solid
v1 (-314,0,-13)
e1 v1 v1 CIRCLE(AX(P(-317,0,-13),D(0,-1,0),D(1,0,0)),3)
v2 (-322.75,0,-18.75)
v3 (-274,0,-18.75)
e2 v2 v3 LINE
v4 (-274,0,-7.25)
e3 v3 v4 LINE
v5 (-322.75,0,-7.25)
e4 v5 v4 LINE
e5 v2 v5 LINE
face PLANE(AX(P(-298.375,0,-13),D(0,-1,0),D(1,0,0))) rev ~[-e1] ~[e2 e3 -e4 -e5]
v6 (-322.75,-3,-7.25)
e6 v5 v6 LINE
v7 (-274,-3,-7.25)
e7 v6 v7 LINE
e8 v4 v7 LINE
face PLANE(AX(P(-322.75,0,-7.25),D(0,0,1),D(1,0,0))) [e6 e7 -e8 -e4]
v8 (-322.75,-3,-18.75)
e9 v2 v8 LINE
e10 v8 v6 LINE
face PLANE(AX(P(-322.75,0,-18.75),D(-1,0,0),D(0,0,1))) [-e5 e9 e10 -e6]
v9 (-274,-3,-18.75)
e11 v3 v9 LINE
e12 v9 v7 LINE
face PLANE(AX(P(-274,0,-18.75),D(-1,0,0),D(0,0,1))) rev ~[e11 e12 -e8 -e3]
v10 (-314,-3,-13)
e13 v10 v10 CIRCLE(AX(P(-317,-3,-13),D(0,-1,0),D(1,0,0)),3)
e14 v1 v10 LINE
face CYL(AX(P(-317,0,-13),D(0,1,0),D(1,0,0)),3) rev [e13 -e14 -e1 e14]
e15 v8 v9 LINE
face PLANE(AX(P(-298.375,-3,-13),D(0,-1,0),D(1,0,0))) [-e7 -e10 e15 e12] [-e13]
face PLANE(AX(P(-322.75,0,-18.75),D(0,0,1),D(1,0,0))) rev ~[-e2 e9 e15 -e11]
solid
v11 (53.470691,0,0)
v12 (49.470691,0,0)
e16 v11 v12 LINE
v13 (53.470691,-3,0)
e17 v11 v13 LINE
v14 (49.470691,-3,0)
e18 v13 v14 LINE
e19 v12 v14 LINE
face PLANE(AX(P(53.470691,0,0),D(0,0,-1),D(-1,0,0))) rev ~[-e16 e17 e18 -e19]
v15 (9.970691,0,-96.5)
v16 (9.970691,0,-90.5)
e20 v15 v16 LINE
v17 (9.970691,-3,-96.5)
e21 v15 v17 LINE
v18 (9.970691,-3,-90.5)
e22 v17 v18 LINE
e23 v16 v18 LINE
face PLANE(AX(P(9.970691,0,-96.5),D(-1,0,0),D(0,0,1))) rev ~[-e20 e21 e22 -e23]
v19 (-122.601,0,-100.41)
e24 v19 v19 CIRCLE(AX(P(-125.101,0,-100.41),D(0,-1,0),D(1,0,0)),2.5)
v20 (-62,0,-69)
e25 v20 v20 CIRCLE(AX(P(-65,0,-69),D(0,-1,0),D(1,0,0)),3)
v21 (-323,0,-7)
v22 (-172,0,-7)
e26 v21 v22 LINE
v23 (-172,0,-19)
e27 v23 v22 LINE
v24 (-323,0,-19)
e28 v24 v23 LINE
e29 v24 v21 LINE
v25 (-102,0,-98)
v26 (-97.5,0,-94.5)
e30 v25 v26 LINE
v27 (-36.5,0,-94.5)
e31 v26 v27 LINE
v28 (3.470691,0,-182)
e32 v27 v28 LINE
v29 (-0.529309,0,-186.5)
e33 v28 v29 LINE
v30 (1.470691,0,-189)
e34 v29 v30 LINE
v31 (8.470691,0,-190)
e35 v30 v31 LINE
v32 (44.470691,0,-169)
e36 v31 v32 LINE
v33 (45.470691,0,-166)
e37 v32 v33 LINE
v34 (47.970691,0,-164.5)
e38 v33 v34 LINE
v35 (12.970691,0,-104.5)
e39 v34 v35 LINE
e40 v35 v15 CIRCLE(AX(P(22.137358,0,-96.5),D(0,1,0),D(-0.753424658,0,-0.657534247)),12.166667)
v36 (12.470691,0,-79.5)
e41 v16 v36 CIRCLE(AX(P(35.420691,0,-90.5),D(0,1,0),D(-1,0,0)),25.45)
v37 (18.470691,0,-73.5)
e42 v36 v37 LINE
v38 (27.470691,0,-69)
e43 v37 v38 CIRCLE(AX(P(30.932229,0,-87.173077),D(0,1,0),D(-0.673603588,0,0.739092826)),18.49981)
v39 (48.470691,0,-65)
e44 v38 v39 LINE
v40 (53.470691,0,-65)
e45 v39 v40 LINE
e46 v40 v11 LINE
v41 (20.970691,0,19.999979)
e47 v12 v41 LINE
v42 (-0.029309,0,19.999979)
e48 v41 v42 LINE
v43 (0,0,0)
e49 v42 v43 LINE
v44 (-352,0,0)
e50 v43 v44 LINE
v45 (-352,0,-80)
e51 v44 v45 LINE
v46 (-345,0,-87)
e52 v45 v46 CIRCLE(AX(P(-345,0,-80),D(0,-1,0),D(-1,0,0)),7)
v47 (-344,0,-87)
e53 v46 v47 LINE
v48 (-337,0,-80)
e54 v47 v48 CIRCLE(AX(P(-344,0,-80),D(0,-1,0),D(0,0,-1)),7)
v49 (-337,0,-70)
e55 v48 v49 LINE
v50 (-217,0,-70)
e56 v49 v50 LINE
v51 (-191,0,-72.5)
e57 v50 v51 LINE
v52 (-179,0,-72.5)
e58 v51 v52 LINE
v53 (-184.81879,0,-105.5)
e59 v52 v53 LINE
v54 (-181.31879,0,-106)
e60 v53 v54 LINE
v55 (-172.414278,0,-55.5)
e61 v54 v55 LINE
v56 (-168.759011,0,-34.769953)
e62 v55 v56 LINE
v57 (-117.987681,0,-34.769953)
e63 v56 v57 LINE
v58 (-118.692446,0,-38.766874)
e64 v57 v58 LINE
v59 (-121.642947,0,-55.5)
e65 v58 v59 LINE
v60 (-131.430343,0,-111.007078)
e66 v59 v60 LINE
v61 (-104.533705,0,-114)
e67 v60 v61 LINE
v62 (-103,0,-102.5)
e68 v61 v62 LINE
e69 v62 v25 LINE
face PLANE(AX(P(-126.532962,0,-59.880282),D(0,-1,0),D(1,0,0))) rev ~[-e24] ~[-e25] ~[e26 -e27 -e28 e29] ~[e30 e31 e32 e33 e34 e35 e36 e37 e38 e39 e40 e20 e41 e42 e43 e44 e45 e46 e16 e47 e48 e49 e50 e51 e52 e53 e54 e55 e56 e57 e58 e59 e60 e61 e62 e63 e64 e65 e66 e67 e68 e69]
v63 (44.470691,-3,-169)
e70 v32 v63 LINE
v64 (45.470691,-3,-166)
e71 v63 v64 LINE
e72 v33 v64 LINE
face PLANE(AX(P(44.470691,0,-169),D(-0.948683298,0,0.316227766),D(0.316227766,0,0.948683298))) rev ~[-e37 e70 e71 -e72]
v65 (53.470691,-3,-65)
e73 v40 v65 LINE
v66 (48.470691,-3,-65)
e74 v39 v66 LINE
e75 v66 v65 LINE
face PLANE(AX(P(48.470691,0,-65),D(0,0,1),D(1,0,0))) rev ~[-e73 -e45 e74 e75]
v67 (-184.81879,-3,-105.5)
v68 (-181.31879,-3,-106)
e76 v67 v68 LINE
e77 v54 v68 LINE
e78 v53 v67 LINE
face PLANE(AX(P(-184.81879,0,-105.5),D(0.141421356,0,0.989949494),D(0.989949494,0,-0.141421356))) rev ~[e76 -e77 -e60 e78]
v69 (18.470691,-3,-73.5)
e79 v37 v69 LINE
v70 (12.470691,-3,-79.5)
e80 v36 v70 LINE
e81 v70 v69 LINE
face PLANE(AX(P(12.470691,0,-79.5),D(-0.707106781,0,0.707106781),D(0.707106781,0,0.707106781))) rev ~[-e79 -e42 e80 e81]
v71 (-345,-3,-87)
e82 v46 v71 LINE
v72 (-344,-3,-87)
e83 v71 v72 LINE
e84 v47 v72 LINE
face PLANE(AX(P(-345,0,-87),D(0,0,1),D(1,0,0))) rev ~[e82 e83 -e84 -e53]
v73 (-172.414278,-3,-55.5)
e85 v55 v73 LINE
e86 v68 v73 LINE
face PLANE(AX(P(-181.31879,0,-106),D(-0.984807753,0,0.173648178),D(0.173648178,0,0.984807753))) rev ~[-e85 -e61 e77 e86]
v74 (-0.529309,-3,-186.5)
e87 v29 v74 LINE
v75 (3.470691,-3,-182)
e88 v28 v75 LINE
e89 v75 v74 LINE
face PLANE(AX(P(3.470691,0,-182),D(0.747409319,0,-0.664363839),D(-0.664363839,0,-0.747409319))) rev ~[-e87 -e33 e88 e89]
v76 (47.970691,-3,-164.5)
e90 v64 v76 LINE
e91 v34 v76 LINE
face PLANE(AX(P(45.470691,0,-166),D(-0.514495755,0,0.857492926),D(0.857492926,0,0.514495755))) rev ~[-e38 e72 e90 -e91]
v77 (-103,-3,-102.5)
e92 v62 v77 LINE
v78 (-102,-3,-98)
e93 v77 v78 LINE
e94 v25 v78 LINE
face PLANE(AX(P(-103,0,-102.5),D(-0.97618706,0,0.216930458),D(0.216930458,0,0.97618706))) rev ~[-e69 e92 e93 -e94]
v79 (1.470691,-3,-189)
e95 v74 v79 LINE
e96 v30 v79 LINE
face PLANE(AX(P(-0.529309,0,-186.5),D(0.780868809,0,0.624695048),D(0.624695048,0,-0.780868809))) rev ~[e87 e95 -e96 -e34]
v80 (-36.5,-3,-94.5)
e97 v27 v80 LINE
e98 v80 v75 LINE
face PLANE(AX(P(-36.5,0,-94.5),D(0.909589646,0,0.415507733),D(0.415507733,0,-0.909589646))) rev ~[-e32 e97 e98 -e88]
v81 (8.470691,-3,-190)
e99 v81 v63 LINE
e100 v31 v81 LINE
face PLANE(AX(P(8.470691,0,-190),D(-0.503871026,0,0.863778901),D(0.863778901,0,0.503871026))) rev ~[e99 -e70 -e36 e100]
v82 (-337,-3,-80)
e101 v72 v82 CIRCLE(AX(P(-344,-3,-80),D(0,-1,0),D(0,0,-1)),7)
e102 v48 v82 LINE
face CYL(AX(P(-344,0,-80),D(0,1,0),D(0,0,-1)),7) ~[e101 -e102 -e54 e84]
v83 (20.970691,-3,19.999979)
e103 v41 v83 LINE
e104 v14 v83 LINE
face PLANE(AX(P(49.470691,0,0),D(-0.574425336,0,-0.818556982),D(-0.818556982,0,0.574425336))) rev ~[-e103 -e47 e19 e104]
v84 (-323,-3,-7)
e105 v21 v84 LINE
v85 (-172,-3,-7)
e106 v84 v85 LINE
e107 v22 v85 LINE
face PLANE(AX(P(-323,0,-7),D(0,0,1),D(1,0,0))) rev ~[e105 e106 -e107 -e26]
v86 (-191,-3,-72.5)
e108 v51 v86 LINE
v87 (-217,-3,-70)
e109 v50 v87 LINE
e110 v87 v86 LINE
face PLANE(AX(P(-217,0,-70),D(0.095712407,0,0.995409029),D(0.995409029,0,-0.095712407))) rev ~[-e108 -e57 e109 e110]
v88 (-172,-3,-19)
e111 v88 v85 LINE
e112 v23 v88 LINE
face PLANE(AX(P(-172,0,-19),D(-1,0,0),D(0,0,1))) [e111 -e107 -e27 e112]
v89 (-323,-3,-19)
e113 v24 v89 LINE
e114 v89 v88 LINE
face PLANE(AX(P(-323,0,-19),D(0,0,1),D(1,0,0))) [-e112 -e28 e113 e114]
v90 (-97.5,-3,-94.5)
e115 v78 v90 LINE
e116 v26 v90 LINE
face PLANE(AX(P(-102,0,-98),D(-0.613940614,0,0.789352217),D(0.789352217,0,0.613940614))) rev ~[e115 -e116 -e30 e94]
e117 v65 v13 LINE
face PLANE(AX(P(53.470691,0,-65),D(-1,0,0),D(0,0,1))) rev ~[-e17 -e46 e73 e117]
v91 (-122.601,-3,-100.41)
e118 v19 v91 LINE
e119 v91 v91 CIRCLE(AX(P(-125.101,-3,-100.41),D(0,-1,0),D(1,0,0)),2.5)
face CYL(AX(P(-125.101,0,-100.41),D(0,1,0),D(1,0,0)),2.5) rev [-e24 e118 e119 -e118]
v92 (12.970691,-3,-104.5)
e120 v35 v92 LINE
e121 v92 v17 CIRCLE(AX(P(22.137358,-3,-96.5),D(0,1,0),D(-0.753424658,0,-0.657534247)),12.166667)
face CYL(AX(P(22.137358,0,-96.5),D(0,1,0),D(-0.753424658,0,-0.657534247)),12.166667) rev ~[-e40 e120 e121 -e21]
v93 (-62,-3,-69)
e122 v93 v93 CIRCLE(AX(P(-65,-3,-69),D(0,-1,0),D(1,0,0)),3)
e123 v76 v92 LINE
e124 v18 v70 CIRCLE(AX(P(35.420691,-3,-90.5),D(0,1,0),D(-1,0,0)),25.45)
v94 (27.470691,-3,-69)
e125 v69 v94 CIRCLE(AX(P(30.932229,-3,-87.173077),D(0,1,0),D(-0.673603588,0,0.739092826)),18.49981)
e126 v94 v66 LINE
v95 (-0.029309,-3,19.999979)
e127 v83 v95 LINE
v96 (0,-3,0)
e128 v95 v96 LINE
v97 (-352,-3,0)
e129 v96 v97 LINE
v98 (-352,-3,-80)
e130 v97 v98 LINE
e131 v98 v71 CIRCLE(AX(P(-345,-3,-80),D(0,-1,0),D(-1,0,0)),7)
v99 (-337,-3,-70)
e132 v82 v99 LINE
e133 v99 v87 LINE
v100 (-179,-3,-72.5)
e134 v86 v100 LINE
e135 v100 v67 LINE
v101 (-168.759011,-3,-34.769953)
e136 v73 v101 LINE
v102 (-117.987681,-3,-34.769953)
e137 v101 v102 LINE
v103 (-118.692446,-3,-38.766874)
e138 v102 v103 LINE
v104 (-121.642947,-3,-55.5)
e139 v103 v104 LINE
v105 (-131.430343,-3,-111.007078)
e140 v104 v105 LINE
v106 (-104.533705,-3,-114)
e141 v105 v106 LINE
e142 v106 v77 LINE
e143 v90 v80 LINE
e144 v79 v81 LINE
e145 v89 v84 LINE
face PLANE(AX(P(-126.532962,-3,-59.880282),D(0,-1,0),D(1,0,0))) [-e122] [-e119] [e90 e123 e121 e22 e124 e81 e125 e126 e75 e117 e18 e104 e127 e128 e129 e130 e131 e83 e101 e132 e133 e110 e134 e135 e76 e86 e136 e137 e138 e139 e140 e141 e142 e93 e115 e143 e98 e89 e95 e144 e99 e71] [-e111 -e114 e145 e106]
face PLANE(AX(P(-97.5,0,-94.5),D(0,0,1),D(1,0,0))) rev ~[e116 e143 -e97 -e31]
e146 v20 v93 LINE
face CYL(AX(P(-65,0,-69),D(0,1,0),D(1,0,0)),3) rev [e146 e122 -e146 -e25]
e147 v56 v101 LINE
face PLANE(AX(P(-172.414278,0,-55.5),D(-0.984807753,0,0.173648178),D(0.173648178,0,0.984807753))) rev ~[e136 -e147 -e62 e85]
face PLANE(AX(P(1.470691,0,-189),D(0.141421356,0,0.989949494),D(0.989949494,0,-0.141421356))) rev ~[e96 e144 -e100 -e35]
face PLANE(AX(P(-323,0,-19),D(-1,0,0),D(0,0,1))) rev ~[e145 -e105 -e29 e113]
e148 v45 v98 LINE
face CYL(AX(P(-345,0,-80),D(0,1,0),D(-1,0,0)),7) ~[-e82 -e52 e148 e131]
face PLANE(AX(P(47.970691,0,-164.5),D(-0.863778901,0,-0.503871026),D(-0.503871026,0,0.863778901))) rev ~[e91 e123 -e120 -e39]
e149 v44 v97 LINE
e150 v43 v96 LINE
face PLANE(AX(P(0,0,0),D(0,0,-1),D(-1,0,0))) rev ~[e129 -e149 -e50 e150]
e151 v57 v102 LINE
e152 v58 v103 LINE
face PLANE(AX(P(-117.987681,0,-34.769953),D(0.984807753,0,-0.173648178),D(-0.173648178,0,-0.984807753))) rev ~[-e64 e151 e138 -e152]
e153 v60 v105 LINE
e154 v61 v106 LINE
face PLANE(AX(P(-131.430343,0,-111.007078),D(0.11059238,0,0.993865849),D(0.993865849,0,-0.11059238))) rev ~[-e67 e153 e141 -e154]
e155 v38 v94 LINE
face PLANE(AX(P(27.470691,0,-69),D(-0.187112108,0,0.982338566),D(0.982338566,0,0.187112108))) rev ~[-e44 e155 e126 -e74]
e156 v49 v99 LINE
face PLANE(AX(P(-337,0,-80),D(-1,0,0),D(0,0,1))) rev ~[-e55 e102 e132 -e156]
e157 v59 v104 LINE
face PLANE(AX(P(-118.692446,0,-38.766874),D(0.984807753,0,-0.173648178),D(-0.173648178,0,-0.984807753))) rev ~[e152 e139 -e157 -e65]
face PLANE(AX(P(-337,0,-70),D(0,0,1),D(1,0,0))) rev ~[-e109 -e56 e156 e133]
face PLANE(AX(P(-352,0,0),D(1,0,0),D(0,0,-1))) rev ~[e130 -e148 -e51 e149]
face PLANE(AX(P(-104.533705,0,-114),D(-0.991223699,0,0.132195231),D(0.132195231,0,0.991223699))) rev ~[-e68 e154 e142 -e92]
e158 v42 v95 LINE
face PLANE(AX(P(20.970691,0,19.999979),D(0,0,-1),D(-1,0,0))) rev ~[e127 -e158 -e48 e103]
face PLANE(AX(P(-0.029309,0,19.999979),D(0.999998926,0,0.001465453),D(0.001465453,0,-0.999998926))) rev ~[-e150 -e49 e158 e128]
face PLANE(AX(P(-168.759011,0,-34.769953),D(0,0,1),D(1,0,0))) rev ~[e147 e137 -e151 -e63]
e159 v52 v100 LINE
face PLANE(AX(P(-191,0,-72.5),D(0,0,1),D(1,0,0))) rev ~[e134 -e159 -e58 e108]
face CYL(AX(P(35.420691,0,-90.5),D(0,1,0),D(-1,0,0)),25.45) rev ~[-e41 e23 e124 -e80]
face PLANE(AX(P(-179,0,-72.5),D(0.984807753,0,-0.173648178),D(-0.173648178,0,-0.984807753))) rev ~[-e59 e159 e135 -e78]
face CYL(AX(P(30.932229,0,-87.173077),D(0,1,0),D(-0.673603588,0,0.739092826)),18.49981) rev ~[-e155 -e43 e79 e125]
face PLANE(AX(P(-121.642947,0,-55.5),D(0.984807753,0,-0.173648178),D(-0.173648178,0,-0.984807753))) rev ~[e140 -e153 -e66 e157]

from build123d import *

# Parameters (mm, degrees)
F0_R     = 2.5
F0_W     = 151
F0_H     = 12
F0_R_2   = 3
F1_DEPTH = 3
F0_W_2   = 48.75
F0_H_2   = 11.5


# Not quite as in the source:
# - a feature names something its author has since deleted; it is built from what else it names


with BuildPart() as f1:
    # F0 (on Front) → F1 (new body)
    with BuildSketch(Plane.XZ):
        with BuildLine():
            Line((48.4706909373, -65), (53.4706909373, -65))
            Line((53.4706909373, -65), (53.4706909373, 0))
            Line((53.4706909373, 0), (49.4706909373, 0))
            Line((49.4706909373, 0), (20.9706909373, 19.9999785245))
            Line((20.9706909373, 19.9999785245), (-0.0293090627, 19.9999785245))
            Line((-0.0293090627, 19.9999785245), (0, 0))
            Line((0, 0), (-352, 0))
            Line((-352, 0), (-352, -39))
            Line((-352, -39), (-352, -55.5))
            Line((-352, -55.5), (-352, -80))
            ThreePointArc((-352, -80), (-349.9497474683, -84.9497474683), (-345, -87))
            Line((-345, -87), (-344, -87))
            ThreePointArc((-344, -87), (-339.0502525317, -84.9497474683), (-337, -80))
            Line((-337, -80), (-337, -70))
            Line((-337, -70), (-217, -70))
            Line((-217, -70), (-191, -72.5))
            Line((-191, -72.5), (-179, -72.5))
            Line((-179, -72.5), (-184.8187903634, -105.5))
            Line((-184.8187903634, -105.5), (-181.3187903634, -106))
            Line((-181.3187903634, -106), (-172.4142778376, -55.5))
            Line((-172.4142778376, -55.5), (-168.7590112311, -34.7699529486))
            Line((-168.7590112311, -34.7699529486), (-117.9876806368, -34.7699529486))
            Line((-117.9876806368, -34.7699529486), (-118.692445624, -38.7668738074))
            Line((-118.692445624, -38.7668738074), (-121.6429472433, -55.5))
            Line((-121.6429472433, -55.5), (-131.4303426842, -111.007077825))
            Line((-131.4303426842, -111.007077825), (-104.5337054221, -114))
            Line((-104.5337054221, -114), (-103, -102.5))
            Line((-103, -102.5), (-102, -98))
            Line((-102, -98), (-97.5, -94.5))
            Line((-97.5, -94.5), (-36.5, -94.5))
            Line((-36.5, -94.5), (3.4706909373, -182))
            Line((3.4706909373, -182), (-0.5293090627, -186.5))
            Line((-0.5293090627, -186.5), (1.4706909373, -189))
            Line((1.4706909373, -189), (8.4706909373, -190))
            Line((8.4706909373, -190), (44.4706909373, -169))
            Line((44.4706909373, -169), (45.4706909373, -166))
            Line((45.4706909373, -166), (47.9706909373, -164.5))
            Line((47.9706909373, -164.5), (12.9706909373, -104.5))
            ThreePointArc((12.9706909373, -104.5), (10.7453526102, -100.7720018727), (9.9706909373, -96.5))
            Line((9.9706909373, -96.5), (9.9706909373, -90.5))
            ThreePointArc((9.9706909373, -90.5), (10.6035597574, -84.8597429137), (12.4706909373, -79.5))
            Line((12.4706909373, -79.5), (18.4706909373, -73.5))
            ThreePointArc((18.4706909373, -73.5), (22.6588628123, -70.6263437501), (27.4706909373, -69))
            Line((27.4706909373, -69), (48.4706909373, -65))
        make_face()
        with Locations((-125.101, -100.41)):
            Circle(F0_R, mode=Mode.SUBTRACT)
        with Locations((-247.5, -13)):
            Rectangle(F0_W, F0_H, mode=Mode.SUBTRACT)
        with Locations((-65, -69)):
            Circle(F0_R_2, mode=Mode.SUBTRACT)
    extrude(amount=F1_DEPTH)


with BuildPart() as f1b:
    # F0 (on Front) → F1, piece 2 (new body)
    with BuildSketch(Plane.XZ):
        with Locations((-298.375, -13)):
            Rectangle(F0_W_2, F0_H_2)
        with Locations((-317, -13)):
            Circle(F0_R_2, mode=Mode.SUBTRACT)
    extrude(amount=F1_DEPTH)


solid = Compound([f1.part, f1b.part])
